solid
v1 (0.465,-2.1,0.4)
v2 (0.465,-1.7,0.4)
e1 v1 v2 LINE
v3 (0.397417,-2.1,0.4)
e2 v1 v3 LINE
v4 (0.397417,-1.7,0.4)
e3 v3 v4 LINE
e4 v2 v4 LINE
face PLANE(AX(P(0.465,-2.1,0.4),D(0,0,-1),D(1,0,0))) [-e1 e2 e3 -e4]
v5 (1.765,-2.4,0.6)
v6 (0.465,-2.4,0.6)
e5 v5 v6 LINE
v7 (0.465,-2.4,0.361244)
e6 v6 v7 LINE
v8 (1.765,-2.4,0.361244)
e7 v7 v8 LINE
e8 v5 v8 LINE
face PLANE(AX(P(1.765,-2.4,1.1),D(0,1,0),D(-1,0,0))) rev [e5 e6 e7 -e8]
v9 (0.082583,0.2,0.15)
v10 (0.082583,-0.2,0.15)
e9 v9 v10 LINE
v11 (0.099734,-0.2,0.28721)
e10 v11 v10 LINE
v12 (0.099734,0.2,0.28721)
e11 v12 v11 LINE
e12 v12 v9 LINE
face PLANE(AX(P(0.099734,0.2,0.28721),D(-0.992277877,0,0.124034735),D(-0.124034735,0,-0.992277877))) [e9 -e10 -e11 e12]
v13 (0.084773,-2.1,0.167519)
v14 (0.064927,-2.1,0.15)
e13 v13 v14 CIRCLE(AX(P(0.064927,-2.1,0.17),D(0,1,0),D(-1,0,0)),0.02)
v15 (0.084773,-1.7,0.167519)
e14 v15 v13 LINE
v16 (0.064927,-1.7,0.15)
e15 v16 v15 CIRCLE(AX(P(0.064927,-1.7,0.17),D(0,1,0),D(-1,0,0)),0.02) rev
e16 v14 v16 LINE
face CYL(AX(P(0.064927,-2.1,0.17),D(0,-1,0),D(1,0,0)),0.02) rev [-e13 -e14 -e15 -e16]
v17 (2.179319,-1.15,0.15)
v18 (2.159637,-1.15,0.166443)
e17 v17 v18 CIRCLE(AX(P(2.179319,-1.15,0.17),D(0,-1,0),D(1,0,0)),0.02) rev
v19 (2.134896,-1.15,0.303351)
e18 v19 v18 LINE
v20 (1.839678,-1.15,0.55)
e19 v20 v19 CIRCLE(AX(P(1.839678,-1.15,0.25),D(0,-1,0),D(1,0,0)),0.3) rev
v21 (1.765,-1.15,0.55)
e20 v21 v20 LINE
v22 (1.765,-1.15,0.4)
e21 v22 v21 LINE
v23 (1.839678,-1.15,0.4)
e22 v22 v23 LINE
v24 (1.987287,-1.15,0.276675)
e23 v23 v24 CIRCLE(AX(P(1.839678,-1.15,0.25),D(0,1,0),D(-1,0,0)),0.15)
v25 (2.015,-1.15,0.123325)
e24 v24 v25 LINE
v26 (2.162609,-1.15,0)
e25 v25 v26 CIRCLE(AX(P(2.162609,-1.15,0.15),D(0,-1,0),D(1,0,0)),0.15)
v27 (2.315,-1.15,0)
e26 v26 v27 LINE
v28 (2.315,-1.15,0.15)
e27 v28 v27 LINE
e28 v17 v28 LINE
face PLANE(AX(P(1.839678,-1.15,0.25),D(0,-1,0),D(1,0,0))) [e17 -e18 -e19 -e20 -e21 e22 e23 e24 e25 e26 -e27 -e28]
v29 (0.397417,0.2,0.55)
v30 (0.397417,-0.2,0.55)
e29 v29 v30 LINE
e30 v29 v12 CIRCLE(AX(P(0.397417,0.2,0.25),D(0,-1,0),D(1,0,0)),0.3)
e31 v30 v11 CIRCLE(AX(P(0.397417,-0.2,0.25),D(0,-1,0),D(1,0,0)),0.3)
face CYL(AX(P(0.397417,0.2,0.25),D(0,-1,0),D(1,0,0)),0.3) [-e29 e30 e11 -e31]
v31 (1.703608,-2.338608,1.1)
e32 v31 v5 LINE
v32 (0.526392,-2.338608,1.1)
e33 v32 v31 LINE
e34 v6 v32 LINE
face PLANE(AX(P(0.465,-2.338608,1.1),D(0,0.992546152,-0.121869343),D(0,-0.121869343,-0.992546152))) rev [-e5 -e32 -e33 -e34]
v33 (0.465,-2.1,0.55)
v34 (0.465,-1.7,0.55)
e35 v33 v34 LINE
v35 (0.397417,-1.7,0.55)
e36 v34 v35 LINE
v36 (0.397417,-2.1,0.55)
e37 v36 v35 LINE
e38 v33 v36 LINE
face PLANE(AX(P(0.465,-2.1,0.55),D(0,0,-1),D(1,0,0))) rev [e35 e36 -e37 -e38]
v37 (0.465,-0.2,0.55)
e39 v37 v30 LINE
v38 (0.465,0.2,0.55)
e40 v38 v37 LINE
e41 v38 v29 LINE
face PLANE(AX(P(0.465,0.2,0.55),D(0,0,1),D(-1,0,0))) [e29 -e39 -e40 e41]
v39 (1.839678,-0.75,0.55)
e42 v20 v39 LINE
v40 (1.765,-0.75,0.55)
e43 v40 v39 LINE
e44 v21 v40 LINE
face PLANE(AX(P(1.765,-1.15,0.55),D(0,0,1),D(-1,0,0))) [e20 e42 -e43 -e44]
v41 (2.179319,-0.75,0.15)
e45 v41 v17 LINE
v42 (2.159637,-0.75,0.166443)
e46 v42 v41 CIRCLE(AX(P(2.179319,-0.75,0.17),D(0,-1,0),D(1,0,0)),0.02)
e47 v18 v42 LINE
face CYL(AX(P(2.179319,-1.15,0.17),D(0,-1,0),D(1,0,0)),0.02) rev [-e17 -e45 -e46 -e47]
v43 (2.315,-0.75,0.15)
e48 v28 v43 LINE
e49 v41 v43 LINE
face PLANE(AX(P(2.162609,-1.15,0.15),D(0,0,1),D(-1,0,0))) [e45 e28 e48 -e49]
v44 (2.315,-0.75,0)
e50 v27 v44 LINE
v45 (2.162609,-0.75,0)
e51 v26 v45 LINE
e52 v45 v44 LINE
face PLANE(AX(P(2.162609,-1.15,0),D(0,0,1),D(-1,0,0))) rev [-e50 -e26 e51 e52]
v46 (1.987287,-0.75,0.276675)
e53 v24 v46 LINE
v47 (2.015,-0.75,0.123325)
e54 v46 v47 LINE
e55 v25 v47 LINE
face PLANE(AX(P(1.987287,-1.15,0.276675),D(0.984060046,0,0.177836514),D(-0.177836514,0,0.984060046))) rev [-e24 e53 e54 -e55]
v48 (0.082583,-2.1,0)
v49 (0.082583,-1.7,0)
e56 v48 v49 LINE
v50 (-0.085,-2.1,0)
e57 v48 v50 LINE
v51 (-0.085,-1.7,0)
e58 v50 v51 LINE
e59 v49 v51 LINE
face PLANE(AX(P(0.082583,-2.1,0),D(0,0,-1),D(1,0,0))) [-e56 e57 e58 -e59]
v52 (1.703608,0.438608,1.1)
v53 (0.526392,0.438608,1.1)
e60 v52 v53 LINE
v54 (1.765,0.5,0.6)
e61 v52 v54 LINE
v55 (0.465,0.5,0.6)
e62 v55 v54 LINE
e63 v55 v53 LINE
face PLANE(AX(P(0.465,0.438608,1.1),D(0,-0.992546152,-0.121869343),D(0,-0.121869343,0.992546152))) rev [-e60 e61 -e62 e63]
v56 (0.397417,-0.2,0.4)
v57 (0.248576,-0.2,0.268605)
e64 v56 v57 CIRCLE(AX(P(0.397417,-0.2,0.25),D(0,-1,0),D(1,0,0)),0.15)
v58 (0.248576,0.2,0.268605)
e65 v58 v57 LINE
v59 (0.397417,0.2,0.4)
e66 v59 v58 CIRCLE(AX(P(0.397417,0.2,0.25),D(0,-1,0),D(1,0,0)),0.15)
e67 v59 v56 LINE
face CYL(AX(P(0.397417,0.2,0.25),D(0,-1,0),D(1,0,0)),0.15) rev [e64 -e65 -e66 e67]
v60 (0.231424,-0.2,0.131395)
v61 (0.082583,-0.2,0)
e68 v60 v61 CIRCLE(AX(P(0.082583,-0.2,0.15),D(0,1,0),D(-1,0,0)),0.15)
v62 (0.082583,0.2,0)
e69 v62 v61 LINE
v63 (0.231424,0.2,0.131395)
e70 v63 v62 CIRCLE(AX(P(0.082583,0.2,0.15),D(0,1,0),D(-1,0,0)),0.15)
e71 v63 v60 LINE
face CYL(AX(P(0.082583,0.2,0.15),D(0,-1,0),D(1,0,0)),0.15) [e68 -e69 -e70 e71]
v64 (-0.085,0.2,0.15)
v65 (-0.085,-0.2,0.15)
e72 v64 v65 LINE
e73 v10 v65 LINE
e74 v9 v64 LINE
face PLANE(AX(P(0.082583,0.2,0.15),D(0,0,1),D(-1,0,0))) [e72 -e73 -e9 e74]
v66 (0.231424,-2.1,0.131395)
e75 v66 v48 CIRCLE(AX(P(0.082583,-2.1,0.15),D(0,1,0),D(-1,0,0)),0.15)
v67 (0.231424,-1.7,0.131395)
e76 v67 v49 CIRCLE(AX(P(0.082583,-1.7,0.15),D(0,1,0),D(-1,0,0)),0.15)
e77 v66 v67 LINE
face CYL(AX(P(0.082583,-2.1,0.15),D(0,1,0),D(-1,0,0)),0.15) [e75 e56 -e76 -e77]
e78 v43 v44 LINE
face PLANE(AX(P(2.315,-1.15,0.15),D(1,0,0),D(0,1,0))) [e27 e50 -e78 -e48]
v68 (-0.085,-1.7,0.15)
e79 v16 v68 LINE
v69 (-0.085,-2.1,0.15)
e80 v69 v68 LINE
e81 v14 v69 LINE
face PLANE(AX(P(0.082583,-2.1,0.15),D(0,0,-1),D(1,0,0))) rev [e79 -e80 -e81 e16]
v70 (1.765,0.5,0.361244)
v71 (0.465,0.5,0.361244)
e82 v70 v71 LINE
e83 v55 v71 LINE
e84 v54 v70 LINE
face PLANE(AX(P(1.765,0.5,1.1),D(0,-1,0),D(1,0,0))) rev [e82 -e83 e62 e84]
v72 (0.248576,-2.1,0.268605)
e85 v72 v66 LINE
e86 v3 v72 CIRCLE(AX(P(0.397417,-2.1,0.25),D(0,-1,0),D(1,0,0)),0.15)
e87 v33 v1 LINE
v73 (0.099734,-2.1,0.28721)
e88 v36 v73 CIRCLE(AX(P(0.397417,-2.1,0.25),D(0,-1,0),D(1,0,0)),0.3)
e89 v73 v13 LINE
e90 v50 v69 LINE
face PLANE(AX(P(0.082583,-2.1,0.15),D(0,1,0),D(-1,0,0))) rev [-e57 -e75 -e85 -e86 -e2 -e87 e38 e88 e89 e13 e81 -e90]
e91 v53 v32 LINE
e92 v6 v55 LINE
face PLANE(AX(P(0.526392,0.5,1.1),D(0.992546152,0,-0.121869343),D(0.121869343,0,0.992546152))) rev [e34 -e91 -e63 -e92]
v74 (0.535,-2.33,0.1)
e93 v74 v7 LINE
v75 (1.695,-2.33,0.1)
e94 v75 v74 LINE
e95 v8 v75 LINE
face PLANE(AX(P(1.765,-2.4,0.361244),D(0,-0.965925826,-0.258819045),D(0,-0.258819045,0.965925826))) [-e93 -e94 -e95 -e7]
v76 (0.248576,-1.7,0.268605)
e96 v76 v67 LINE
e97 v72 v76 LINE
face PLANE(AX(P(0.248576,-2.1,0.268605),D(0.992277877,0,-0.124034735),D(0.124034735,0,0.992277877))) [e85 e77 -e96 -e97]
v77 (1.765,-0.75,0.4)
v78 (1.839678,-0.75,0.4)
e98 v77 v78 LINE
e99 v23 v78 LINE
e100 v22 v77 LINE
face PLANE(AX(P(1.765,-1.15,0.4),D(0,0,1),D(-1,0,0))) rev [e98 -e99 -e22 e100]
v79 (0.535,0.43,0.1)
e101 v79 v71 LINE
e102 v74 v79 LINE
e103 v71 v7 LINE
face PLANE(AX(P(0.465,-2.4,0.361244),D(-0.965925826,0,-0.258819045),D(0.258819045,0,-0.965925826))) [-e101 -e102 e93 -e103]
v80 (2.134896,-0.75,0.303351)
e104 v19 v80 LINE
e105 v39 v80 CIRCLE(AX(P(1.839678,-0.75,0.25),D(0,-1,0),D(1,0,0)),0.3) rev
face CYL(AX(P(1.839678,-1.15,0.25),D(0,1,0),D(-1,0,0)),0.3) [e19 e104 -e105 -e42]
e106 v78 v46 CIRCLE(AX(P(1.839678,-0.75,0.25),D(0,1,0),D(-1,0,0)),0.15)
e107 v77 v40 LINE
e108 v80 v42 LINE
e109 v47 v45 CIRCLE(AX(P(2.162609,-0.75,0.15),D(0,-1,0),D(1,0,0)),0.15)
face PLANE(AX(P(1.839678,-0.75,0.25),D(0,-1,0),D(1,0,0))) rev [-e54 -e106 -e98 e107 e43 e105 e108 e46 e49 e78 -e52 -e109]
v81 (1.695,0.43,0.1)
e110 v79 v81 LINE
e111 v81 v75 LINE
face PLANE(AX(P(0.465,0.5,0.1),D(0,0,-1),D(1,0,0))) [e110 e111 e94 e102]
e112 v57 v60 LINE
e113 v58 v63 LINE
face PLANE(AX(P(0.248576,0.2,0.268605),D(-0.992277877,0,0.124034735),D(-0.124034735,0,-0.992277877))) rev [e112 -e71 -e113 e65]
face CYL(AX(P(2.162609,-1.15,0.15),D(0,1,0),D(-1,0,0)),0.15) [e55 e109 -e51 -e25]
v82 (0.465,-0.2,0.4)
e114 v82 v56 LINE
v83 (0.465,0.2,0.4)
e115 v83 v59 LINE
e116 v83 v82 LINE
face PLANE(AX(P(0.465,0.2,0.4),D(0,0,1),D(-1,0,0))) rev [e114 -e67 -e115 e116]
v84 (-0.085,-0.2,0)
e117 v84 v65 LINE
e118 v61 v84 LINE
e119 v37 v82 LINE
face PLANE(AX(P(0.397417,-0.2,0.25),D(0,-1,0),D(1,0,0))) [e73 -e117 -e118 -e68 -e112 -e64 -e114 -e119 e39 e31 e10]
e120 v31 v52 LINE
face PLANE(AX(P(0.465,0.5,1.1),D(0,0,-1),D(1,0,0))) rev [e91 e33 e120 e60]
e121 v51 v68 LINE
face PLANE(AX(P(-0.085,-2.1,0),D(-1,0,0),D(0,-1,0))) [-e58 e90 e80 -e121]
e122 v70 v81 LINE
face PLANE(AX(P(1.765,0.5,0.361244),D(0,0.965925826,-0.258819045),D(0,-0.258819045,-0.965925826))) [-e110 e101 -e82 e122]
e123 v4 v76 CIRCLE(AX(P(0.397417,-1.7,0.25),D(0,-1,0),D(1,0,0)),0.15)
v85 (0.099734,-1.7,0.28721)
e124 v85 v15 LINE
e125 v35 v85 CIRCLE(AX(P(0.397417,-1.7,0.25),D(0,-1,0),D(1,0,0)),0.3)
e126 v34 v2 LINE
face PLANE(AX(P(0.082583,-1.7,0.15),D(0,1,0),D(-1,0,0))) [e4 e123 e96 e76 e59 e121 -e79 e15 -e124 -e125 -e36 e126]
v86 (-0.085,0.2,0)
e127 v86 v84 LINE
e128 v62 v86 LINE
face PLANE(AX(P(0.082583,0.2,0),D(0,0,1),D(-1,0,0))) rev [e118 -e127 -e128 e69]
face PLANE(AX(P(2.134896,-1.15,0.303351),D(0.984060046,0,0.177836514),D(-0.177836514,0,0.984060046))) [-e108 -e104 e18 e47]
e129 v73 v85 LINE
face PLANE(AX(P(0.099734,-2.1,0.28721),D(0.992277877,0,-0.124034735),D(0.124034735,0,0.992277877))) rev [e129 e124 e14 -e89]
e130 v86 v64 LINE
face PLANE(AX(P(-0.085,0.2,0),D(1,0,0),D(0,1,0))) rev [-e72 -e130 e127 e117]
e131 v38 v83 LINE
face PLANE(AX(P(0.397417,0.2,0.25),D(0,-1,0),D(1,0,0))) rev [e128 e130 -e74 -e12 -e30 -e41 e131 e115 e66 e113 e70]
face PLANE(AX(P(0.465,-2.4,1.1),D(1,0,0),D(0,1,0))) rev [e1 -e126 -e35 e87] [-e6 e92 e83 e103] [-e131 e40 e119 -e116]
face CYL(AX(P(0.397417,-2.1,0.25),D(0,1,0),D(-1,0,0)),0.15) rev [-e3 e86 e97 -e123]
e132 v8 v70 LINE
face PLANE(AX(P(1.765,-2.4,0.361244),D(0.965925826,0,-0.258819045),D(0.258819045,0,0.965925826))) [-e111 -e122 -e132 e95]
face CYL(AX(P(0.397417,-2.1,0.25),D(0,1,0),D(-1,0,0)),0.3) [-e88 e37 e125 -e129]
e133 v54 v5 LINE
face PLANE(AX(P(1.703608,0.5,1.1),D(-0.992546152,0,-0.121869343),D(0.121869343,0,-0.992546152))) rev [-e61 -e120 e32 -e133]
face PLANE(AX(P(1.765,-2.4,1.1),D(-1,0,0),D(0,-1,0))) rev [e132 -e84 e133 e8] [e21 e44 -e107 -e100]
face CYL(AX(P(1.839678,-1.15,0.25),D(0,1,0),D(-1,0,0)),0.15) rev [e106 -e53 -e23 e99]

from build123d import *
from OCP.BRepFilletAPI import BRepFilletAPI_MakeChamfer

# Parameters (mm, degrees)
SKETCH_1_W        = 2.9
SKETCH_1_H        = 1.3
EXTRUDE_1_DEPTH   = 1
EXTRUDE_2_DEPTH   = 0.2
EXTRUDE_3_DEPTH   = 0.2
FILLET_1_R        = 0.02
CHAMFER_1_SIZE    = 0.5
CHAMFER_1_SIZE2   = 0.06139228
CHAMFER_2_SIZE    = 0.07
CHAMFER_2_SIZE2   = 0.261243557
MOVE_BODY_1_ANGLE = 120


with BuildPart() as part:
    # Эскиз1 → Бобышка-Вытянуть1 (new body)
    with BuildSketch(Plane(origin=(0, -0.1, 0), x_dir=(-1, 0, 0), z_dir=(0, 1, 0))):
        Rectangle(SKETCH_1_W, SKETCH_1_H)
    extrude(amount=EXTRUDE_1_DEPTH)

    # Эскиз3 → Вытянуть-Тонкостенный2 (add, symmetric)
    with BuildSketch(Plane(origin=(0, 0, 0), x_dir=(0, 0, -1), z_dir=(1, 0, 0))):
        with BuildLine():
            Line((0.65, 0.2), (0.724677848, 0.2))
            ThreePointArc((0.724677848, 0.2), (0.820851333, 0.165111515), (0.872286855, 0.076675477))
            Line((0.872286855, 0.076675477), (0.9, -0.076675477))
            ThreePointArc((0.9, -0.076675477), (0.951435522, -0.165111515), (1.047609007, -0.2))
            Line((1.047609007, -0.2), (1.2, -0.2))
            Line((1.2, -0.2), (1.2, -0.05))
            Line((1.2, -0.05), (1.047609007, -0.05))
            Line((1.047609007, -0.05), (1.019895862, 0.103350954))
            ThreePointArc((1.019895862, 0.103350954), (0.917024818, 0.280223029), (0.724677848, 0.35))
            Line((0.724677848, 0.35), (0.65, 0.35))
            Line((0.65, 0.35), (0.65, 0.2))
        make_face()
    extrude(amount=EXTRUDE_2_DEPTH, both=True)

    # Эскиз4 → Вытянуть-Тонкостенный3 (add, symmetric)
    with BuildSketch(Plane(origin=(0.95, 0, 0), x_dir=(0, 0, -1), z_dir=(1, 0, 0))):
        with BuildLine():
            Line((-0.65, 0.2), (-0.717582667, 0.2))
            ThreePointArc((-0.717582667, 0.2), (-0.816853052, 0.162451726), (-0.866424349, 0.06860521))
            Line((-0.866424349, 0.06860521), (-0.883575651, -0.06860521))
            ThreePointArc((-0.883575651, -0.06860521), (-0.933146948, -0.162451726), (-1.032417333, -0.2))
            Line((-1.032417333, -0.2), (-1.2, -0.2))
            Line((-1.2, -0.2), (-1.2, -0.05))
            Line((-1.2, -0.05), (-1.032417333, -0.05))
            Line((-1.032417333, -0.05), (-1.01526603, 0.08721042))
            ThreePointArc((-1.01526603, 0.08721042), (-0.916123436, 0.274903453), (-0.717582667, 0.35))
            Line((-0.717582667, 0.35), (-0.65, 0.35))
            Line((-0.65, 0.35), (-0.65, 0.2))
        make_face()
    extrude_3 = extrude(amount=EXTRUDE_3_DEPTH, both=True)

    # Скругление1
    fillet_1_edges = [part.edges().sort_by_distance(p)[0] for p in [
        (0, -0.05, -1.047609007),
        (0.95, -0.05, 1.032417333),
    ]]
    fillet(fillet_1_edges, radius=FILLET_1_R)

    # Зеркальное отражение1: Вытянуть-Тонкостенный3 across plane
    add(extrude_3.mirror(Plane(origin=(0, 0, 0), x_dir=(0, 0, 1), z_dir=(1, 0, 0))))

    # Фаска1: one chamfer whose edges measure the first distance from different faces: ONE call of the kernel's chamfer builder (chamfer() names one face for all edges)
    chamfer_1_edges_1 = [part.edges().sort_by_distance(p)[0] for p in [
        (1.45, 0.9, 0),
    ]]
    chamfer_1_side_1 = [part.faces().sort_by_distance(p)[0] for p in [
        (1.45, 0.4, 0),
    ]]
    chamfer_1_edges_2 = [part.edges().sort_by_distance(p)[0] for p in [
        (0, 0.9, -0.65),
    ]]
    chamfer_1_side_2 = [part.faces().sort_by_distance(p)[0] for p in [
        (0, 0.402640845, -0.65),
    ]]
    chamfer_1_edges_3 = [part.edges().sort_by_distance(p)[0] for p in [
        (-1.45, 0.9, 0),
    ]]
    chamfer_1_side_3 = [part.faces().sort_by_distance(p)[0] for p in [
        (-1.45, 0.4, 0),
    ]]
    chamfer_1_edges_4 = [part.edges().sort_by_distance(p)[0] for p in [
        (0, 0.9, 0.65),
    ]]
    chamfer_1_side_4 = [part.faces().sort_by_distance(p)[0] for p in [
        (0, 0.405395683, 0.65),
    ]]
    chamfer_1 = BRepFilletAPI_MakeChamfer(part.part.solid().wrapped)
    for e in chamfer_1_edges_1:
        chamfer_1.Add(CHAMFER_1_SIZE, CHAMFER_1_SIZE2, e.wrapped, chamfer_1_side_1[0].wrapped)  # the first distance lies on this face
    for e in chamfer_1_edges_2:
        chamfer_1.Add(CHAMFER_1_SIZE, CHAMFER_1_SIZE2, e.wrapped, chamfer_1_side_2[0].wrapped)  # the first distance lies on this face
    for e in chamfer_1_edges_3:
        chamfer_1.Add(CHAMFER_1_SIZE, CHAMFER_1_SIZE2, e.wrapped, chamfer_1_side_3[0].wrapped)  # the first distance lies on this face
    for e in chamfer_1_edges_4:
        chamfer_1.Add(CHAMFER_1_SIZE, CHAMFER_1_SIZE2, e.wrapped, chamfer_1_side_4[0].wrapped)  # the first distance lies on this face
    add(Compound.cast(chamfer_1.Shape()), mode=Mode.REPLACE)

    # Фаска2
    chamfer_2_edges = [part.edges().sort_by_distance(p)[0] for p in [
        (0, -0.1, -0.65),
        (1.45, -0.1, 0),
        (0, -0.1, 0.65),
        (-1.45, -0.1, 0),
    ]]
    chamfer_2_side = [part.faces().sort_by_distance(p)[0] for p in [
        (0, -0.1, 0),
    ]]
    chamfer(chamfer_2_edges, length=CHAMFER_2_SIZE, length2=CHAMFER_2_SIZE2, reference=chamfer_2_side[0])


with BuildPart() as part_1:
    # Move Body 1: read off the stored shape, not the designer's step
    # Move Body 1: moved
    add(part.part.moved(Location((0.95, 0.2, -1.115))).rotate(Axis((0, 0, 0), (0.5773502692, -0.5773502692, -0.5773502692)), MOVE_BODY_1_ANGLE))


solid = part_1.part
